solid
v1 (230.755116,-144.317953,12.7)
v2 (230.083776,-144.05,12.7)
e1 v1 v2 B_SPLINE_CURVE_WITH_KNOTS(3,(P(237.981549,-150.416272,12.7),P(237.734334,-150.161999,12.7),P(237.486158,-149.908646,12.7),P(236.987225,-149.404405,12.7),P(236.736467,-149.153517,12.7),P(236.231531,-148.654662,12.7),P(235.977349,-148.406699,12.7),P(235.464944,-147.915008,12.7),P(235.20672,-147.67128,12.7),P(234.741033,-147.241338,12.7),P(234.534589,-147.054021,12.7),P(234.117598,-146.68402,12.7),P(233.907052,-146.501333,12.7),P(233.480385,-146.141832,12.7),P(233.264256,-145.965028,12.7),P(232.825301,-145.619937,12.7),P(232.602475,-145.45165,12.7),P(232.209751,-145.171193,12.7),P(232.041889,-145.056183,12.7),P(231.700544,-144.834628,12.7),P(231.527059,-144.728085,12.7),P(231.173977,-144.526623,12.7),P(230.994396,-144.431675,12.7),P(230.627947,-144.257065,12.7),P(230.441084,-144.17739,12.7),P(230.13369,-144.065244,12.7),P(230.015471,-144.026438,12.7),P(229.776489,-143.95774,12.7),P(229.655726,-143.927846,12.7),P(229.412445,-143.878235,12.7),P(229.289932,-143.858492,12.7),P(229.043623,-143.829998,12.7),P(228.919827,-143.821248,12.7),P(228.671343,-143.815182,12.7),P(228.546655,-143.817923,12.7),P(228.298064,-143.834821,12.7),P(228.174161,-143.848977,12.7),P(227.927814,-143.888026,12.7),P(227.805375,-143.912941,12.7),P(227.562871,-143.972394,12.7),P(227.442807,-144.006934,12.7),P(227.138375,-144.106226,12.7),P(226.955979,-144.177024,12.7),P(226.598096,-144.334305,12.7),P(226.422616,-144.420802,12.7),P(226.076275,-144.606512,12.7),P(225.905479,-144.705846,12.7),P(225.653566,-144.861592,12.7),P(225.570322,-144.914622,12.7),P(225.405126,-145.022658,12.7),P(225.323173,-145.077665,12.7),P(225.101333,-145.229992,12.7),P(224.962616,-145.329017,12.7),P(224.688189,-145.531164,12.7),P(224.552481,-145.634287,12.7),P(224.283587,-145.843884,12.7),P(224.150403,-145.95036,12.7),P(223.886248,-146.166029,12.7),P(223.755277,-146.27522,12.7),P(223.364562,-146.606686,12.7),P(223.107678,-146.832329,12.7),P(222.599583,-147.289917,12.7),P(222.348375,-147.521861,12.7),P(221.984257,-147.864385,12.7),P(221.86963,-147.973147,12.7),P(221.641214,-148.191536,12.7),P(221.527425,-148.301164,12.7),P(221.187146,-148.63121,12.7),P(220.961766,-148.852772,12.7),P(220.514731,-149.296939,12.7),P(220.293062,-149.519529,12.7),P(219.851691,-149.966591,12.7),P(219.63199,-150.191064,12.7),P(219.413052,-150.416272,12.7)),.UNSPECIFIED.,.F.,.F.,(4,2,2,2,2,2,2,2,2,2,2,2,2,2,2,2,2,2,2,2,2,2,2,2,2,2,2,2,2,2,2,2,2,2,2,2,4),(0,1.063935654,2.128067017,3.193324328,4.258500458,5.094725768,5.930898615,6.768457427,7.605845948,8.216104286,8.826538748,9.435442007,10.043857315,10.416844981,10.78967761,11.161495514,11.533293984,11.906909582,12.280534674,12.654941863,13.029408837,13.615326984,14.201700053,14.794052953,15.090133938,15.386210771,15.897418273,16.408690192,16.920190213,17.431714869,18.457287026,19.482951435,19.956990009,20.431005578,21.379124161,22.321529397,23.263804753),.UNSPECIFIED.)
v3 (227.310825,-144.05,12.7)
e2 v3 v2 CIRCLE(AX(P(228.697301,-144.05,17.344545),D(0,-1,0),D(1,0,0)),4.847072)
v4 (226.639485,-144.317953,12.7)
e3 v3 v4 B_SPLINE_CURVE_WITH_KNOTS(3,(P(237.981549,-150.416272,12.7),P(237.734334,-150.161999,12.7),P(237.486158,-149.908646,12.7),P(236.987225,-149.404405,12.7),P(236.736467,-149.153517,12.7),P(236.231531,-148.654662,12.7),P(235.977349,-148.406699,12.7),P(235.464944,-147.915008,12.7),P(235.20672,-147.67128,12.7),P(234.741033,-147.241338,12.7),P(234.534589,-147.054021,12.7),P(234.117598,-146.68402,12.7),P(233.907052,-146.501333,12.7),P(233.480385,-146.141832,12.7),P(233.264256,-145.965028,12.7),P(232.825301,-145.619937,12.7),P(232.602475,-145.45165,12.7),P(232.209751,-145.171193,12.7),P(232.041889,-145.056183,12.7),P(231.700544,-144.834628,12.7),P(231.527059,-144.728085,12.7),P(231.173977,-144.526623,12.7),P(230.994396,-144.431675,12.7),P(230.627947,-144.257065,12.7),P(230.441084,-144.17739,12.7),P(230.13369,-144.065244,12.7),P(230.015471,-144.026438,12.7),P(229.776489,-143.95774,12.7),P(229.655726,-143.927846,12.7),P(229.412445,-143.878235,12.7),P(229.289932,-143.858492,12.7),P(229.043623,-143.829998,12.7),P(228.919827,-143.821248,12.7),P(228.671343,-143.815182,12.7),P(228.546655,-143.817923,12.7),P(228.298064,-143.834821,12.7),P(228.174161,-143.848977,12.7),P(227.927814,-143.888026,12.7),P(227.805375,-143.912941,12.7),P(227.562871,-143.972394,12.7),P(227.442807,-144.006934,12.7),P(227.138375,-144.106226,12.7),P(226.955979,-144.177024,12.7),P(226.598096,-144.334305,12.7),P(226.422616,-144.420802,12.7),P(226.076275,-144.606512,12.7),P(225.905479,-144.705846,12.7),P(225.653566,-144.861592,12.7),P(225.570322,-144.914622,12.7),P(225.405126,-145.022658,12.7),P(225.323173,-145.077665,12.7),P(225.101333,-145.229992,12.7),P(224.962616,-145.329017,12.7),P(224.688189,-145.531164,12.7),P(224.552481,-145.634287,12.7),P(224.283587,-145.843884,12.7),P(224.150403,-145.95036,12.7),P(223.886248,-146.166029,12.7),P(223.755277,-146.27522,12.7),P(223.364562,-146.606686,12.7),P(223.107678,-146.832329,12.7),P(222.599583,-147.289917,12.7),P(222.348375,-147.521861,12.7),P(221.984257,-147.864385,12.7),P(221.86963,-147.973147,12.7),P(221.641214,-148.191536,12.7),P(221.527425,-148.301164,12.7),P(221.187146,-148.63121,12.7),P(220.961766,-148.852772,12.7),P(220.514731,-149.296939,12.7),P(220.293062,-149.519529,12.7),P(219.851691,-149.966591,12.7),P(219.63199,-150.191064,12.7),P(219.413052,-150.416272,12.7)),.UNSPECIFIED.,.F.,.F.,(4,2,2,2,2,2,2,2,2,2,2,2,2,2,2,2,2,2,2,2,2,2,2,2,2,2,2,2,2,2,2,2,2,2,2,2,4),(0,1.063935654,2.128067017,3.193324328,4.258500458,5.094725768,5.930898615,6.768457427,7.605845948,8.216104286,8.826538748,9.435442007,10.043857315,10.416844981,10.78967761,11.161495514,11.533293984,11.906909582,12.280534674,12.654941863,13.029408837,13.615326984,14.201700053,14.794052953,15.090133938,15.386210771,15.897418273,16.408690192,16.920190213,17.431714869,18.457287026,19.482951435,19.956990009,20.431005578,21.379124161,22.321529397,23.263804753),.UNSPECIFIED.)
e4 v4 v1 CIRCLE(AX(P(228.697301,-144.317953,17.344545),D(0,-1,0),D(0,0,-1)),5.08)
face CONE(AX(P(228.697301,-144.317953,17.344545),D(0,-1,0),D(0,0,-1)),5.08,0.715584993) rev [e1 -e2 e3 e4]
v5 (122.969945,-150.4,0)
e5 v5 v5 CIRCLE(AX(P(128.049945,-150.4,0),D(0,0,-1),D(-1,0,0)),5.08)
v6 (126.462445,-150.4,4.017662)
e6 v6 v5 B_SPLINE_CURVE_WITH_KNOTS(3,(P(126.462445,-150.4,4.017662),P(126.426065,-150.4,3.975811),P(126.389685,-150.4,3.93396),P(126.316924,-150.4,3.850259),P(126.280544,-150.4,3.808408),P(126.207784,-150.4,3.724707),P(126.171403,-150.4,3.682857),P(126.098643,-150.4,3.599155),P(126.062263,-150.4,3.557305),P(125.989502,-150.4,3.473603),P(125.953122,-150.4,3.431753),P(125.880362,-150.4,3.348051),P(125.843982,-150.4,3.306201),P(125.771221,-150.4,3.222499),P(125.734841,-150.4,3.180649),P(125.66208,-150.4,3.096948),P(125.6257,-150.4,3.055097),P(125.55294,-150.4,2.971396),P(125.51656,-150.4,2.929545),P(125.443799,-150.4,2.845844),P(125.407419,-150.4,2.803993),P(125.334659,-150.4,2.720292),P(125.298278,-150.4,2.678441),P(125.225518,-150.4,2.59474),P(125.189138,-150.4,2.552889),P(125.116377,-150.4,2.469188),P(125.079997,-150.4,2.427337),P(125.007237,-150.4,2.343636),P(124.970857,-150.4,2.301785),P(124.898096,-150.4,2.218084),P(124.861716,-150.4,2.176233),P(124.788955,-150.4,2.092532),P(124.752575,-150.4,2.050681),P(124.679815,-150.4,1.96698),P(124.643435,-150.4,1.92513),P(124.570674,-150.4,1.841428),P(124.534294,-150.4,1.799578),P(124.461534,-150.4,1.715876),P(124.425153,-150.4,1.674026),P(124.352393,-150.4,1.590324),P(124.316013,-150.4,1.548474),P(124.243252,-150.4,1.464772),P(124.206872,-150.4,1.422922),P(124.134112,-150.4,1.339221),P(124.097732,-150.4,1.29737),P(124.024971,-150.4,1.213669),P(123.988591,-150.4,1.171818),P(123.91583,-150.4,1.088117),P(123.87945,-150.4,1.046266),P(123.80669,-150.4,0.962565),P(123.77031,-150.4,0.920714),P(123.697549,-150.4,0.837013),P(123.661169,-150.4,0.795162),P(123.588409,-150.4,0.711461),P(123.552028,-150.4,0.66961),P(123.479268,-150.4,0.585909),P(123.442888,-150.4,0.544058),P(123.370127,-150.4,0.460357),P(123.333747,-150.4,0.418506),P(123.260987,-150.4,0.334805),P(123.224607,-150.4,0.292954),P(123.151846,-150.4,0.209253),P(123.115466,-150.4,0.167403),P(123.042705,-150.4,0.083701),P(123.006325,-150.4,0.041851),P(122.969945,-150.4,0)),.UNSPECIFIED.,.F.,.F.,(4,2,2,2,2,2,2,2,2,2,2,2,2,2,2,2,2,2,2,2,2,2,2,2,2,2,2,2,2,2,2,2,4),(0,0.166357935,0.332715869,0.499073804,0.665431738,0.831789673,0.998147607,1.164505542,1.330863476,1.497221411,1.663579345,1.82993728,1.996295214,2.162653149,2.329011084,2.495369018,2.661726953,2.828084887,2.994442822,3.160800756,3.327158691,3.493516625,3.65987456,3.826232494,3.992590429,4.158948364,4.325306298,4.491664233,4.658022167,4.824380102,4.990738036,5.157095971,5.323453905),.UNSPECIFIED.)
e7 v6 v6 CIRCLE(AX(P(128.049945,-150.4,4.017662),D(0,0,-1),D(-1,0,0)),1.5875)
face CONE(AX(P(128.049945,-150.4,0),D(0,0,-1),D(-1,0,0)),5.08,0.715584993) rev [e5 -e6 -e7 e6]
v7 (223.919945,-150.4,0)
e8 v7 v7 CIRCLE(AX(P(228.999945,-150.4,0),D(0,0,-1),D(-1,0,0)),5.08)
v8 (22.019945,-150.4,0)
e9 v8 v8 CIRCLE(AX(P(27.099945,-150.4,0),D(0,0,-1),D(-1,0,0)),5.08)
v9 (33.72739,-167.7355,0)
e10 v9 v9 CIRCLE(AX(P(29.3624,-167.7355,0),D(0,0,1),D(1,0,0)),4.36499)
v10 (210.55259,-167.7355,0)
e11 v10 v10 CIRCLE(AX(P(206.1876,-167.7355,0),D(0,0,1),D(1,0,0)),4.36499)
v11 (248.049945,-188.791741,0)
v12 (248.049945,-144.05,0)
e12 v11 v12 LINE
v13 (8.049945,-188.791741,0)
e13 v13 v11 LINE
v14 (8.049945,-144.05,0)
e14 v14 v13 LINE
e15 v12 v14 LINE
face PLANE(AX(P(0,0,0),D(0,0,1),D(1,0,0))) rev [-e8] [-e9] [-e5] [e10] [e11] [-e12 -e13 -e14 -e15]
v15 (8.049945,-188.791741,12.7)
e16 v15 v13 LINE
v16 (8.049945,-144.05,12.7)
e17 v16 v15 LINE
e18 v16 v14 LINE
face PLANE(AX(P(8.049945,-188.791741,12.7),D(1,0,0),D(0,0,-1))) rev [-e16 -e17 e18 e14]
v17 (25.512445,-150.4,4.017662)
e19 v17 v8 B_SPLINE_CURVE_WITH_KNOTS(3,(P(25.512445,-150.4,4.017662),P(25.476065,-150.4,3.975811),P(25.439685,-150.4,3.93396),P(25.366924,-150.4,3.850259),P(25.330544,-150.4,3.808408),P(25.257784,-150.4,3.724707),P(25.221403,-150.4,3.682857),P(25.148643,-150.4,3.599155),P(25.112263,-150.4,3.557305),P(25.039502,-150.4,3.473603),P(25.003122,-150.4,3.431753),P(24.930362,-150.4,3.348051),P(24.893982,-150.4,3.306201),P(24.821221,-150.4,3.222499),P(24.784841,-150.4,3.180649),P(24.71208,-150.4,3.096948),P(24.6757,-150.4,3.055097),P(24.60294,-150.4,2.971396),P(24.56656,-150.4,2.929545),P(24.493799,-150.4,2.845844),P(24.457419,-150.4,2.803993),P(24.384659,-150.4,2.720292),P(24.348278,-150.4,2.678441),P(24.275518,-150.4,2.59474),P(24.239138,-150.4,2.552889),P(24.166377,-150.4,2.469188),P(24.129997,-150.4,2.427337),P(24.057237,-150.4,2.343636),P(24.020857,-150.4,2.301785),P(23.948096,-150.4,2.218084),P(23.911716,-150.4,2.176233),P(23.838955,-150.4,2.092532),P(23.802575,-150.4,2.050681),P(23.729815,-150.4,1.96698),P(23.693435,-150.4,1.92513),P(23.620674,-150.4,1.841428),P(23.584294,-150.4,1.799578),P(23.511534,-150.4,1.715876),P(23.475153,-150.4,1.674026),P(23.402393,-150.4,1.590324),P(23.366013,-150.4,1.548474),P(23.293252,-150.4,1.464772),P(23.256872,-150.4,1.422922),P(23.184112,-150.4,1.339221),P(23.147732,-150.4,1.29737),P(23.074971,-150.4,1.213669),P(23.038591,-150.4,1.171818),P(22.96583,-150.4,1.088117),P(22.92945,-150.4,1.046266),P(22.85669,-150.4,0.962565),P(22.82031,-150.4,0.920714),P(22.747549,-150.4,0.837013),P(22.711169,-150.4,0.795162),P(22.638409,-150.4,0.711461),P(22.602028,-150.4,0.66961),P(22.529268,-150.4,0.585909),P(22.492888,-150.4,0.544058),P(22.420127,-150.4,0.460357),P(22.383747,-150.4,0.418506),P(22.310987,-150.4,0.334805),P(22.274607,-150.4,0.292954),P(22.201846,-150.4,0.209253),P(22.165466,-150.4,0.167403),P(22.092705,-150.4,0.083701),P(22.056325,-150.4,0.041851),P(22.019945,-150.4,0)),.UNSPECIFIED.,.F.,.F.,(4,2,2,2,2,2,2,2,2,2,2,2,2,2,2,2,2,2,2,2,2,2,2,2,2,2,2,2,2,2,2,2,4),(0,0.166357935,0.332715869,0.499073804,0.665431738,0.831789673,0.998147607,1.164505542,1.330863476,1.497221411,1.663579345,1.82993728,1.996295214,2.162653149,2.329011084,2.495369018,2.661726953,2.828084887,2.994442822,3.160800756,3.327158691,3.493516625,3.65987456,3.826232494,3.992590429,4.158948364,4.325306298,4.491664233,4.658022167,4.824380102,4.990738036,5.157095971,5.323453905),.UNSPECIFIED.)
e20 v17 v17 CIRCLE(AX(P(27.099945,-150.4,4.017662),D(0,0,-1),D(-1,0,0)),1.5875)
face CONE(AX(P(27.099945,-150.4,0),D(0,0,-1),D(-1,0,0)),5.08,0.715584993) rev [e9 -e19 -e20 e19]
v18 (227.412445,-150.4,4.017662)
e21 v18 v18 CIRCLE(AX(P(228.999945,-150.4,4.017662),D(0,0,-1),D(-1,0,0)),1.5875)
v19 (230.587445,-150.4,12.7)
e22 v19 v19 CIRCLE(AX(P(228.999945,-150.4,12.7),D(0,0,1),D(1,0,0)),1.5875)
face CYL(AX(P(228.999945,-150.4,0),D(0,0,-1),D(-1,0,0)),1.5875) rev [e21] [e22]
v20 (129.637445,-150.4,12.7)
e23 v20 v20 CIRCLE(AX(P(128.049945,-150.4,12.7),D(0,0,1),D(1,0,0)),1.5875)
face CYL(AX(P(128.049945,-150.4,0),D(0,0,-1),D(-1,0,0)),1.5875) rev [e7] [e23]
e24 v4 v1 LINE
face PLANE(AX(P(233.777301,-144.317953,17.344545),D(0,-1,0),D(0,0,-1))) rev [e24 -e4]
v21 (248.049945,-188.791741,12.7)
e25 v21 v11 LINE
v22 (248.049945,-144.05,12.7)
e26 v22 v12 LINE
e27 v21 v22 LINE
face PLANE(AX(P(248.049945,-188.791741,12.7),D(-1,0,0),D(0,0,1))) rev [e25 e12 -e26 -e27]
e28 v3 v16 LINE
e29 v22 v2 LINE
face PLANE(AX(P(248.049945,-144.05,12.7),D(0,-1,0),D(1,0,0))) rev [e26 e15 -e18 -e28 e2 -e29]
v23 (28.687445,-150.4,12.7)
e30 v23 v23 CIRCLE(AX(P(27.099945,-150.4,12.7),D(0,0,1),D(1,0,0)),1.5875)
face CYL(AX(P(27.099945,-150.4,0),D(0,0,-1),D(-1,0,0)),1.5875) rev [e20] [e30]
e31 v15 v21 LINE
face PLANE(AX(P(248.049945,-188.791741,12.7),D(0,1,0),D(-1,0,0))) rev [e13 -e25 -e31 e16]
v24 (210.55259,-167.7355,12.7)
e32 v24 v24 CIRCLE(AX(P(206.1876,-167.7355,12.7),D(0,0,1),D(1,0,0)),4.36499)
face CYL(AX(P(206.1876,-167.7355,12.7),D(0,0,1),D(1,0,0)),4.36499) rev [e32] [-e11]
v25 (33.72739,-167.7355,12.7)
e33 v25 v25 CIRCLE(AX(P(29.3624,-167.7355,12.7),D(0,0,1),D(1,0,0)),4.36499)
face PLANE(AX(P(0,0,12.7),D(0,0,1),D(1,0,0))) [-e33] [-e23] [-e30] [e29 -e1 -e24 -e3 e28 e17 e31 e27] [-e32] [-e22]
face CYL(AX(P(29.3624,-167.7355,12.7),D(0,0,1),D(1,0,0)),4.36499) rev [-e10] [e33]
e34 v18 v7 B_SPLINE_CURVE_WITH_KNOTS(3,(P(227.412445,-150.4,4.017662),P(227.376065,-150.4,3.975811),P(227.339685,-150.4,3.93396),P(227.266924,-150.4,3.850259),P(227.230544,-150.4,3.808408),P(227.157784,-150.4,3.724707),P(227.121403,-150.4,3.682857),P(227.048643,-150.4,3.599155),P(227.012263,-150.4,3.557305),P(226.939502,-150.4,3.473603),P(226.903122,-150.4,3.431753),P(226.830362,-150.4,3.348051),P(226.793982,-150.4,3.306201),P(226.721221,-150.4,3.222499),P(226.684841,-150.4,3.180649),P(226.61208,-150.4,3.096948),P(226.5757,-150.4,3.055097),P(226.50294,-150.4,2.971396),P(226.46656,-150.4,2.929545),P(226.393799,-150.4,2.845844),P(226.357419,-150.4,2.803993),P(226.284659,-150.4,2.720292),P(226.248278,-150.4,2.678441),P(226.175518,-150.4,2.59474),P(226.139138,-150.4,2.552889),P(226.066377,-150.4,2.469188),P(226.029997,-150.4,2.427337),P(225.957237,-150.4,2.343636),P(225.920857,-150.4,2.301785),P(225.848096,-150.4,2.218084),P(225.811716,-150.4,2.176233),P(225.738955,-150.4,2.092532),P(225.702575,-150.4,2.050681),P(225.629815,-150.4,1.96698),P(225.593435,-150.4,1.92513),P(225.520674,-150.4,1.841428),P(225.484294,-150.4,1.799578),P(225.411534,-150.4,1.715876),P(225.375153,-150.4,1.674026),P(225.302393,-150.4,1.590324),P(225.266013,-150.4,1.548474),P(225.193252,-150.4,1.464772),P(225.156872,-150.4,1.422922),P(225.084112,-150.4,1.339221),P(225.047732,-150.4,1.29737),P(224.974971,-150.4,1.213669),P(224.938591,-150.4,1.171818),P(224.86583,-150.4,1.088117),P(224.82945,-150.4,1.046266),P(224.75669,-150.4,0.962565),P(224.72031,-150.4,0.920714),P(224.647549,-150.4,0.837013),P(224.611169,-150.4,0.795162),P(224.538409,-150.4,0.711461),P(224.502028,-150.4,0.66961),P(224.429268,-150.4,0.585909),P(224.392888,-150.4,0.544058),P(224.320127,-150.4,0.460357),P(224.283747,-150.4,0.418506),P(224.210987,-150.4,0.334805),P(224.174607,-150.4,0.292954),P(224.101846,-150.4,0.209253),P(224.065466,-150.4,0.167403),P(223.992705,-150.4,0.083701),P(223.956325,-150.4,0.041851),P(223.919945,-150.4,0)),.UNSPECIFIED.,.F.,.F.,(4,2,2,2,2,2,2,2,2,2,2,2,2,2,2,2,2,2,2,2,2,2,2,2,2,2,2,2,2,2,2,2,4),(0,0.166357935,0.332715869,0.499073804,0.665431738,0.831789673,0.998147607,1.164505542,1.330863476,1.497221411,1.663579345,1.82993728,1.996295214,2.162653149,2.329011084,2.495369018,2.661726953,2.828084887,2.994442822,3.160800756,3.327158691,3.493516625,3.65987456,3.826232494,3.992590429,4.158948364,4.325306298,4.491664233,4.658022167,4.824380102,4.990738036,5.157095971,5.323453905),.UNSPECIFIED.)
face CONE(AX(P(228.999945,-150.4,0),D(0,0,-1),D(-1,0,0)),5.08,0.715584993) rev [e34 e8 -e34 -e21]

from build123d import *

# Parameters (mm, degrees)
SKETCH1_W                = 240
SKETCH1_H                = 44.741741382
BOSS_EXTRUDE1_DEPTH      = 12.7
HOLE1_D                  = 3.175
HOLE1_DEPTH              = 38.1
HOLE1_CSINK_D            = 10.16
HOLE1_CSINK_ANGLE        = 82
HOLE1_TIP                = 0.953866233
F_5_16_CLEARANCE_HOLE1_D = 8.72998


# Read off the part's stored shape, not the designer's step: Hole2
with BuildPart() as part:
    # Sketch1 → Boss-Extrude1 (new body)
    with BuildSketch(Plane.XY):
        with Locations((128.049945057, -166.420870685)):
            Rectangle(SKETCH1_W, SKETCH1_H)
    extrude(amount=BOSS_EXTRUDE1_DEPTH)

    # Hole1
    with Locations(Plane(origin=(-1072.859770441, -52.974999997, 0), x_dir=(0, 1, 0), z_dir=(0, 0, -1))):
        with Locations((-97.424999997, 1099.959715498), (-97.424999997, 1301.859715498), (-97.424999997, 1200.909715498)):
            CounterSinkHole(HOLE1_D / 2, HOLE1_CSINK_D / 2, depth=HOLE1_DEPTH, counter_sink_angle=HOLE1_CSINK_ANGLE)
            with Locations((0, 0, -(HOLE1_DEPTH + HOLE1_TIP / 2))):  # 118° drill point
                Cone(0, HOLE1_D / 2, HOLE1_TIP, mode=Mode.SUBTRACT)

    # Hole2 outline → Hole2 (revolve, cut)
    with BuildSketch(Plane(origin=(228.697300635, 0, 17.344544827), x_dir=(1, 0, 0), z_dir=(0, 0, 1))):
        Polygon((4.644544827, -144.049999968), (4.644544827, -144.317952856), (5.080000174, -144.317952756), (4.847072326, -144.049999968), align=None)
    revolve(axis=Axis((228.697300635, 0, 17.344544827), (0, 1, 0)), mode=Mode.SUBTRACT)

    # 5/16 Clearance Hole1 (through all)
    with Locations(Plane.XY.offset(12.7)):
        with Locations((29.3624, -167.735499994), (206.1876, -167.735499994)):
            Hole(F_5_16_CLEARANCE_HOLE1_D / 2)


solid = part.part
